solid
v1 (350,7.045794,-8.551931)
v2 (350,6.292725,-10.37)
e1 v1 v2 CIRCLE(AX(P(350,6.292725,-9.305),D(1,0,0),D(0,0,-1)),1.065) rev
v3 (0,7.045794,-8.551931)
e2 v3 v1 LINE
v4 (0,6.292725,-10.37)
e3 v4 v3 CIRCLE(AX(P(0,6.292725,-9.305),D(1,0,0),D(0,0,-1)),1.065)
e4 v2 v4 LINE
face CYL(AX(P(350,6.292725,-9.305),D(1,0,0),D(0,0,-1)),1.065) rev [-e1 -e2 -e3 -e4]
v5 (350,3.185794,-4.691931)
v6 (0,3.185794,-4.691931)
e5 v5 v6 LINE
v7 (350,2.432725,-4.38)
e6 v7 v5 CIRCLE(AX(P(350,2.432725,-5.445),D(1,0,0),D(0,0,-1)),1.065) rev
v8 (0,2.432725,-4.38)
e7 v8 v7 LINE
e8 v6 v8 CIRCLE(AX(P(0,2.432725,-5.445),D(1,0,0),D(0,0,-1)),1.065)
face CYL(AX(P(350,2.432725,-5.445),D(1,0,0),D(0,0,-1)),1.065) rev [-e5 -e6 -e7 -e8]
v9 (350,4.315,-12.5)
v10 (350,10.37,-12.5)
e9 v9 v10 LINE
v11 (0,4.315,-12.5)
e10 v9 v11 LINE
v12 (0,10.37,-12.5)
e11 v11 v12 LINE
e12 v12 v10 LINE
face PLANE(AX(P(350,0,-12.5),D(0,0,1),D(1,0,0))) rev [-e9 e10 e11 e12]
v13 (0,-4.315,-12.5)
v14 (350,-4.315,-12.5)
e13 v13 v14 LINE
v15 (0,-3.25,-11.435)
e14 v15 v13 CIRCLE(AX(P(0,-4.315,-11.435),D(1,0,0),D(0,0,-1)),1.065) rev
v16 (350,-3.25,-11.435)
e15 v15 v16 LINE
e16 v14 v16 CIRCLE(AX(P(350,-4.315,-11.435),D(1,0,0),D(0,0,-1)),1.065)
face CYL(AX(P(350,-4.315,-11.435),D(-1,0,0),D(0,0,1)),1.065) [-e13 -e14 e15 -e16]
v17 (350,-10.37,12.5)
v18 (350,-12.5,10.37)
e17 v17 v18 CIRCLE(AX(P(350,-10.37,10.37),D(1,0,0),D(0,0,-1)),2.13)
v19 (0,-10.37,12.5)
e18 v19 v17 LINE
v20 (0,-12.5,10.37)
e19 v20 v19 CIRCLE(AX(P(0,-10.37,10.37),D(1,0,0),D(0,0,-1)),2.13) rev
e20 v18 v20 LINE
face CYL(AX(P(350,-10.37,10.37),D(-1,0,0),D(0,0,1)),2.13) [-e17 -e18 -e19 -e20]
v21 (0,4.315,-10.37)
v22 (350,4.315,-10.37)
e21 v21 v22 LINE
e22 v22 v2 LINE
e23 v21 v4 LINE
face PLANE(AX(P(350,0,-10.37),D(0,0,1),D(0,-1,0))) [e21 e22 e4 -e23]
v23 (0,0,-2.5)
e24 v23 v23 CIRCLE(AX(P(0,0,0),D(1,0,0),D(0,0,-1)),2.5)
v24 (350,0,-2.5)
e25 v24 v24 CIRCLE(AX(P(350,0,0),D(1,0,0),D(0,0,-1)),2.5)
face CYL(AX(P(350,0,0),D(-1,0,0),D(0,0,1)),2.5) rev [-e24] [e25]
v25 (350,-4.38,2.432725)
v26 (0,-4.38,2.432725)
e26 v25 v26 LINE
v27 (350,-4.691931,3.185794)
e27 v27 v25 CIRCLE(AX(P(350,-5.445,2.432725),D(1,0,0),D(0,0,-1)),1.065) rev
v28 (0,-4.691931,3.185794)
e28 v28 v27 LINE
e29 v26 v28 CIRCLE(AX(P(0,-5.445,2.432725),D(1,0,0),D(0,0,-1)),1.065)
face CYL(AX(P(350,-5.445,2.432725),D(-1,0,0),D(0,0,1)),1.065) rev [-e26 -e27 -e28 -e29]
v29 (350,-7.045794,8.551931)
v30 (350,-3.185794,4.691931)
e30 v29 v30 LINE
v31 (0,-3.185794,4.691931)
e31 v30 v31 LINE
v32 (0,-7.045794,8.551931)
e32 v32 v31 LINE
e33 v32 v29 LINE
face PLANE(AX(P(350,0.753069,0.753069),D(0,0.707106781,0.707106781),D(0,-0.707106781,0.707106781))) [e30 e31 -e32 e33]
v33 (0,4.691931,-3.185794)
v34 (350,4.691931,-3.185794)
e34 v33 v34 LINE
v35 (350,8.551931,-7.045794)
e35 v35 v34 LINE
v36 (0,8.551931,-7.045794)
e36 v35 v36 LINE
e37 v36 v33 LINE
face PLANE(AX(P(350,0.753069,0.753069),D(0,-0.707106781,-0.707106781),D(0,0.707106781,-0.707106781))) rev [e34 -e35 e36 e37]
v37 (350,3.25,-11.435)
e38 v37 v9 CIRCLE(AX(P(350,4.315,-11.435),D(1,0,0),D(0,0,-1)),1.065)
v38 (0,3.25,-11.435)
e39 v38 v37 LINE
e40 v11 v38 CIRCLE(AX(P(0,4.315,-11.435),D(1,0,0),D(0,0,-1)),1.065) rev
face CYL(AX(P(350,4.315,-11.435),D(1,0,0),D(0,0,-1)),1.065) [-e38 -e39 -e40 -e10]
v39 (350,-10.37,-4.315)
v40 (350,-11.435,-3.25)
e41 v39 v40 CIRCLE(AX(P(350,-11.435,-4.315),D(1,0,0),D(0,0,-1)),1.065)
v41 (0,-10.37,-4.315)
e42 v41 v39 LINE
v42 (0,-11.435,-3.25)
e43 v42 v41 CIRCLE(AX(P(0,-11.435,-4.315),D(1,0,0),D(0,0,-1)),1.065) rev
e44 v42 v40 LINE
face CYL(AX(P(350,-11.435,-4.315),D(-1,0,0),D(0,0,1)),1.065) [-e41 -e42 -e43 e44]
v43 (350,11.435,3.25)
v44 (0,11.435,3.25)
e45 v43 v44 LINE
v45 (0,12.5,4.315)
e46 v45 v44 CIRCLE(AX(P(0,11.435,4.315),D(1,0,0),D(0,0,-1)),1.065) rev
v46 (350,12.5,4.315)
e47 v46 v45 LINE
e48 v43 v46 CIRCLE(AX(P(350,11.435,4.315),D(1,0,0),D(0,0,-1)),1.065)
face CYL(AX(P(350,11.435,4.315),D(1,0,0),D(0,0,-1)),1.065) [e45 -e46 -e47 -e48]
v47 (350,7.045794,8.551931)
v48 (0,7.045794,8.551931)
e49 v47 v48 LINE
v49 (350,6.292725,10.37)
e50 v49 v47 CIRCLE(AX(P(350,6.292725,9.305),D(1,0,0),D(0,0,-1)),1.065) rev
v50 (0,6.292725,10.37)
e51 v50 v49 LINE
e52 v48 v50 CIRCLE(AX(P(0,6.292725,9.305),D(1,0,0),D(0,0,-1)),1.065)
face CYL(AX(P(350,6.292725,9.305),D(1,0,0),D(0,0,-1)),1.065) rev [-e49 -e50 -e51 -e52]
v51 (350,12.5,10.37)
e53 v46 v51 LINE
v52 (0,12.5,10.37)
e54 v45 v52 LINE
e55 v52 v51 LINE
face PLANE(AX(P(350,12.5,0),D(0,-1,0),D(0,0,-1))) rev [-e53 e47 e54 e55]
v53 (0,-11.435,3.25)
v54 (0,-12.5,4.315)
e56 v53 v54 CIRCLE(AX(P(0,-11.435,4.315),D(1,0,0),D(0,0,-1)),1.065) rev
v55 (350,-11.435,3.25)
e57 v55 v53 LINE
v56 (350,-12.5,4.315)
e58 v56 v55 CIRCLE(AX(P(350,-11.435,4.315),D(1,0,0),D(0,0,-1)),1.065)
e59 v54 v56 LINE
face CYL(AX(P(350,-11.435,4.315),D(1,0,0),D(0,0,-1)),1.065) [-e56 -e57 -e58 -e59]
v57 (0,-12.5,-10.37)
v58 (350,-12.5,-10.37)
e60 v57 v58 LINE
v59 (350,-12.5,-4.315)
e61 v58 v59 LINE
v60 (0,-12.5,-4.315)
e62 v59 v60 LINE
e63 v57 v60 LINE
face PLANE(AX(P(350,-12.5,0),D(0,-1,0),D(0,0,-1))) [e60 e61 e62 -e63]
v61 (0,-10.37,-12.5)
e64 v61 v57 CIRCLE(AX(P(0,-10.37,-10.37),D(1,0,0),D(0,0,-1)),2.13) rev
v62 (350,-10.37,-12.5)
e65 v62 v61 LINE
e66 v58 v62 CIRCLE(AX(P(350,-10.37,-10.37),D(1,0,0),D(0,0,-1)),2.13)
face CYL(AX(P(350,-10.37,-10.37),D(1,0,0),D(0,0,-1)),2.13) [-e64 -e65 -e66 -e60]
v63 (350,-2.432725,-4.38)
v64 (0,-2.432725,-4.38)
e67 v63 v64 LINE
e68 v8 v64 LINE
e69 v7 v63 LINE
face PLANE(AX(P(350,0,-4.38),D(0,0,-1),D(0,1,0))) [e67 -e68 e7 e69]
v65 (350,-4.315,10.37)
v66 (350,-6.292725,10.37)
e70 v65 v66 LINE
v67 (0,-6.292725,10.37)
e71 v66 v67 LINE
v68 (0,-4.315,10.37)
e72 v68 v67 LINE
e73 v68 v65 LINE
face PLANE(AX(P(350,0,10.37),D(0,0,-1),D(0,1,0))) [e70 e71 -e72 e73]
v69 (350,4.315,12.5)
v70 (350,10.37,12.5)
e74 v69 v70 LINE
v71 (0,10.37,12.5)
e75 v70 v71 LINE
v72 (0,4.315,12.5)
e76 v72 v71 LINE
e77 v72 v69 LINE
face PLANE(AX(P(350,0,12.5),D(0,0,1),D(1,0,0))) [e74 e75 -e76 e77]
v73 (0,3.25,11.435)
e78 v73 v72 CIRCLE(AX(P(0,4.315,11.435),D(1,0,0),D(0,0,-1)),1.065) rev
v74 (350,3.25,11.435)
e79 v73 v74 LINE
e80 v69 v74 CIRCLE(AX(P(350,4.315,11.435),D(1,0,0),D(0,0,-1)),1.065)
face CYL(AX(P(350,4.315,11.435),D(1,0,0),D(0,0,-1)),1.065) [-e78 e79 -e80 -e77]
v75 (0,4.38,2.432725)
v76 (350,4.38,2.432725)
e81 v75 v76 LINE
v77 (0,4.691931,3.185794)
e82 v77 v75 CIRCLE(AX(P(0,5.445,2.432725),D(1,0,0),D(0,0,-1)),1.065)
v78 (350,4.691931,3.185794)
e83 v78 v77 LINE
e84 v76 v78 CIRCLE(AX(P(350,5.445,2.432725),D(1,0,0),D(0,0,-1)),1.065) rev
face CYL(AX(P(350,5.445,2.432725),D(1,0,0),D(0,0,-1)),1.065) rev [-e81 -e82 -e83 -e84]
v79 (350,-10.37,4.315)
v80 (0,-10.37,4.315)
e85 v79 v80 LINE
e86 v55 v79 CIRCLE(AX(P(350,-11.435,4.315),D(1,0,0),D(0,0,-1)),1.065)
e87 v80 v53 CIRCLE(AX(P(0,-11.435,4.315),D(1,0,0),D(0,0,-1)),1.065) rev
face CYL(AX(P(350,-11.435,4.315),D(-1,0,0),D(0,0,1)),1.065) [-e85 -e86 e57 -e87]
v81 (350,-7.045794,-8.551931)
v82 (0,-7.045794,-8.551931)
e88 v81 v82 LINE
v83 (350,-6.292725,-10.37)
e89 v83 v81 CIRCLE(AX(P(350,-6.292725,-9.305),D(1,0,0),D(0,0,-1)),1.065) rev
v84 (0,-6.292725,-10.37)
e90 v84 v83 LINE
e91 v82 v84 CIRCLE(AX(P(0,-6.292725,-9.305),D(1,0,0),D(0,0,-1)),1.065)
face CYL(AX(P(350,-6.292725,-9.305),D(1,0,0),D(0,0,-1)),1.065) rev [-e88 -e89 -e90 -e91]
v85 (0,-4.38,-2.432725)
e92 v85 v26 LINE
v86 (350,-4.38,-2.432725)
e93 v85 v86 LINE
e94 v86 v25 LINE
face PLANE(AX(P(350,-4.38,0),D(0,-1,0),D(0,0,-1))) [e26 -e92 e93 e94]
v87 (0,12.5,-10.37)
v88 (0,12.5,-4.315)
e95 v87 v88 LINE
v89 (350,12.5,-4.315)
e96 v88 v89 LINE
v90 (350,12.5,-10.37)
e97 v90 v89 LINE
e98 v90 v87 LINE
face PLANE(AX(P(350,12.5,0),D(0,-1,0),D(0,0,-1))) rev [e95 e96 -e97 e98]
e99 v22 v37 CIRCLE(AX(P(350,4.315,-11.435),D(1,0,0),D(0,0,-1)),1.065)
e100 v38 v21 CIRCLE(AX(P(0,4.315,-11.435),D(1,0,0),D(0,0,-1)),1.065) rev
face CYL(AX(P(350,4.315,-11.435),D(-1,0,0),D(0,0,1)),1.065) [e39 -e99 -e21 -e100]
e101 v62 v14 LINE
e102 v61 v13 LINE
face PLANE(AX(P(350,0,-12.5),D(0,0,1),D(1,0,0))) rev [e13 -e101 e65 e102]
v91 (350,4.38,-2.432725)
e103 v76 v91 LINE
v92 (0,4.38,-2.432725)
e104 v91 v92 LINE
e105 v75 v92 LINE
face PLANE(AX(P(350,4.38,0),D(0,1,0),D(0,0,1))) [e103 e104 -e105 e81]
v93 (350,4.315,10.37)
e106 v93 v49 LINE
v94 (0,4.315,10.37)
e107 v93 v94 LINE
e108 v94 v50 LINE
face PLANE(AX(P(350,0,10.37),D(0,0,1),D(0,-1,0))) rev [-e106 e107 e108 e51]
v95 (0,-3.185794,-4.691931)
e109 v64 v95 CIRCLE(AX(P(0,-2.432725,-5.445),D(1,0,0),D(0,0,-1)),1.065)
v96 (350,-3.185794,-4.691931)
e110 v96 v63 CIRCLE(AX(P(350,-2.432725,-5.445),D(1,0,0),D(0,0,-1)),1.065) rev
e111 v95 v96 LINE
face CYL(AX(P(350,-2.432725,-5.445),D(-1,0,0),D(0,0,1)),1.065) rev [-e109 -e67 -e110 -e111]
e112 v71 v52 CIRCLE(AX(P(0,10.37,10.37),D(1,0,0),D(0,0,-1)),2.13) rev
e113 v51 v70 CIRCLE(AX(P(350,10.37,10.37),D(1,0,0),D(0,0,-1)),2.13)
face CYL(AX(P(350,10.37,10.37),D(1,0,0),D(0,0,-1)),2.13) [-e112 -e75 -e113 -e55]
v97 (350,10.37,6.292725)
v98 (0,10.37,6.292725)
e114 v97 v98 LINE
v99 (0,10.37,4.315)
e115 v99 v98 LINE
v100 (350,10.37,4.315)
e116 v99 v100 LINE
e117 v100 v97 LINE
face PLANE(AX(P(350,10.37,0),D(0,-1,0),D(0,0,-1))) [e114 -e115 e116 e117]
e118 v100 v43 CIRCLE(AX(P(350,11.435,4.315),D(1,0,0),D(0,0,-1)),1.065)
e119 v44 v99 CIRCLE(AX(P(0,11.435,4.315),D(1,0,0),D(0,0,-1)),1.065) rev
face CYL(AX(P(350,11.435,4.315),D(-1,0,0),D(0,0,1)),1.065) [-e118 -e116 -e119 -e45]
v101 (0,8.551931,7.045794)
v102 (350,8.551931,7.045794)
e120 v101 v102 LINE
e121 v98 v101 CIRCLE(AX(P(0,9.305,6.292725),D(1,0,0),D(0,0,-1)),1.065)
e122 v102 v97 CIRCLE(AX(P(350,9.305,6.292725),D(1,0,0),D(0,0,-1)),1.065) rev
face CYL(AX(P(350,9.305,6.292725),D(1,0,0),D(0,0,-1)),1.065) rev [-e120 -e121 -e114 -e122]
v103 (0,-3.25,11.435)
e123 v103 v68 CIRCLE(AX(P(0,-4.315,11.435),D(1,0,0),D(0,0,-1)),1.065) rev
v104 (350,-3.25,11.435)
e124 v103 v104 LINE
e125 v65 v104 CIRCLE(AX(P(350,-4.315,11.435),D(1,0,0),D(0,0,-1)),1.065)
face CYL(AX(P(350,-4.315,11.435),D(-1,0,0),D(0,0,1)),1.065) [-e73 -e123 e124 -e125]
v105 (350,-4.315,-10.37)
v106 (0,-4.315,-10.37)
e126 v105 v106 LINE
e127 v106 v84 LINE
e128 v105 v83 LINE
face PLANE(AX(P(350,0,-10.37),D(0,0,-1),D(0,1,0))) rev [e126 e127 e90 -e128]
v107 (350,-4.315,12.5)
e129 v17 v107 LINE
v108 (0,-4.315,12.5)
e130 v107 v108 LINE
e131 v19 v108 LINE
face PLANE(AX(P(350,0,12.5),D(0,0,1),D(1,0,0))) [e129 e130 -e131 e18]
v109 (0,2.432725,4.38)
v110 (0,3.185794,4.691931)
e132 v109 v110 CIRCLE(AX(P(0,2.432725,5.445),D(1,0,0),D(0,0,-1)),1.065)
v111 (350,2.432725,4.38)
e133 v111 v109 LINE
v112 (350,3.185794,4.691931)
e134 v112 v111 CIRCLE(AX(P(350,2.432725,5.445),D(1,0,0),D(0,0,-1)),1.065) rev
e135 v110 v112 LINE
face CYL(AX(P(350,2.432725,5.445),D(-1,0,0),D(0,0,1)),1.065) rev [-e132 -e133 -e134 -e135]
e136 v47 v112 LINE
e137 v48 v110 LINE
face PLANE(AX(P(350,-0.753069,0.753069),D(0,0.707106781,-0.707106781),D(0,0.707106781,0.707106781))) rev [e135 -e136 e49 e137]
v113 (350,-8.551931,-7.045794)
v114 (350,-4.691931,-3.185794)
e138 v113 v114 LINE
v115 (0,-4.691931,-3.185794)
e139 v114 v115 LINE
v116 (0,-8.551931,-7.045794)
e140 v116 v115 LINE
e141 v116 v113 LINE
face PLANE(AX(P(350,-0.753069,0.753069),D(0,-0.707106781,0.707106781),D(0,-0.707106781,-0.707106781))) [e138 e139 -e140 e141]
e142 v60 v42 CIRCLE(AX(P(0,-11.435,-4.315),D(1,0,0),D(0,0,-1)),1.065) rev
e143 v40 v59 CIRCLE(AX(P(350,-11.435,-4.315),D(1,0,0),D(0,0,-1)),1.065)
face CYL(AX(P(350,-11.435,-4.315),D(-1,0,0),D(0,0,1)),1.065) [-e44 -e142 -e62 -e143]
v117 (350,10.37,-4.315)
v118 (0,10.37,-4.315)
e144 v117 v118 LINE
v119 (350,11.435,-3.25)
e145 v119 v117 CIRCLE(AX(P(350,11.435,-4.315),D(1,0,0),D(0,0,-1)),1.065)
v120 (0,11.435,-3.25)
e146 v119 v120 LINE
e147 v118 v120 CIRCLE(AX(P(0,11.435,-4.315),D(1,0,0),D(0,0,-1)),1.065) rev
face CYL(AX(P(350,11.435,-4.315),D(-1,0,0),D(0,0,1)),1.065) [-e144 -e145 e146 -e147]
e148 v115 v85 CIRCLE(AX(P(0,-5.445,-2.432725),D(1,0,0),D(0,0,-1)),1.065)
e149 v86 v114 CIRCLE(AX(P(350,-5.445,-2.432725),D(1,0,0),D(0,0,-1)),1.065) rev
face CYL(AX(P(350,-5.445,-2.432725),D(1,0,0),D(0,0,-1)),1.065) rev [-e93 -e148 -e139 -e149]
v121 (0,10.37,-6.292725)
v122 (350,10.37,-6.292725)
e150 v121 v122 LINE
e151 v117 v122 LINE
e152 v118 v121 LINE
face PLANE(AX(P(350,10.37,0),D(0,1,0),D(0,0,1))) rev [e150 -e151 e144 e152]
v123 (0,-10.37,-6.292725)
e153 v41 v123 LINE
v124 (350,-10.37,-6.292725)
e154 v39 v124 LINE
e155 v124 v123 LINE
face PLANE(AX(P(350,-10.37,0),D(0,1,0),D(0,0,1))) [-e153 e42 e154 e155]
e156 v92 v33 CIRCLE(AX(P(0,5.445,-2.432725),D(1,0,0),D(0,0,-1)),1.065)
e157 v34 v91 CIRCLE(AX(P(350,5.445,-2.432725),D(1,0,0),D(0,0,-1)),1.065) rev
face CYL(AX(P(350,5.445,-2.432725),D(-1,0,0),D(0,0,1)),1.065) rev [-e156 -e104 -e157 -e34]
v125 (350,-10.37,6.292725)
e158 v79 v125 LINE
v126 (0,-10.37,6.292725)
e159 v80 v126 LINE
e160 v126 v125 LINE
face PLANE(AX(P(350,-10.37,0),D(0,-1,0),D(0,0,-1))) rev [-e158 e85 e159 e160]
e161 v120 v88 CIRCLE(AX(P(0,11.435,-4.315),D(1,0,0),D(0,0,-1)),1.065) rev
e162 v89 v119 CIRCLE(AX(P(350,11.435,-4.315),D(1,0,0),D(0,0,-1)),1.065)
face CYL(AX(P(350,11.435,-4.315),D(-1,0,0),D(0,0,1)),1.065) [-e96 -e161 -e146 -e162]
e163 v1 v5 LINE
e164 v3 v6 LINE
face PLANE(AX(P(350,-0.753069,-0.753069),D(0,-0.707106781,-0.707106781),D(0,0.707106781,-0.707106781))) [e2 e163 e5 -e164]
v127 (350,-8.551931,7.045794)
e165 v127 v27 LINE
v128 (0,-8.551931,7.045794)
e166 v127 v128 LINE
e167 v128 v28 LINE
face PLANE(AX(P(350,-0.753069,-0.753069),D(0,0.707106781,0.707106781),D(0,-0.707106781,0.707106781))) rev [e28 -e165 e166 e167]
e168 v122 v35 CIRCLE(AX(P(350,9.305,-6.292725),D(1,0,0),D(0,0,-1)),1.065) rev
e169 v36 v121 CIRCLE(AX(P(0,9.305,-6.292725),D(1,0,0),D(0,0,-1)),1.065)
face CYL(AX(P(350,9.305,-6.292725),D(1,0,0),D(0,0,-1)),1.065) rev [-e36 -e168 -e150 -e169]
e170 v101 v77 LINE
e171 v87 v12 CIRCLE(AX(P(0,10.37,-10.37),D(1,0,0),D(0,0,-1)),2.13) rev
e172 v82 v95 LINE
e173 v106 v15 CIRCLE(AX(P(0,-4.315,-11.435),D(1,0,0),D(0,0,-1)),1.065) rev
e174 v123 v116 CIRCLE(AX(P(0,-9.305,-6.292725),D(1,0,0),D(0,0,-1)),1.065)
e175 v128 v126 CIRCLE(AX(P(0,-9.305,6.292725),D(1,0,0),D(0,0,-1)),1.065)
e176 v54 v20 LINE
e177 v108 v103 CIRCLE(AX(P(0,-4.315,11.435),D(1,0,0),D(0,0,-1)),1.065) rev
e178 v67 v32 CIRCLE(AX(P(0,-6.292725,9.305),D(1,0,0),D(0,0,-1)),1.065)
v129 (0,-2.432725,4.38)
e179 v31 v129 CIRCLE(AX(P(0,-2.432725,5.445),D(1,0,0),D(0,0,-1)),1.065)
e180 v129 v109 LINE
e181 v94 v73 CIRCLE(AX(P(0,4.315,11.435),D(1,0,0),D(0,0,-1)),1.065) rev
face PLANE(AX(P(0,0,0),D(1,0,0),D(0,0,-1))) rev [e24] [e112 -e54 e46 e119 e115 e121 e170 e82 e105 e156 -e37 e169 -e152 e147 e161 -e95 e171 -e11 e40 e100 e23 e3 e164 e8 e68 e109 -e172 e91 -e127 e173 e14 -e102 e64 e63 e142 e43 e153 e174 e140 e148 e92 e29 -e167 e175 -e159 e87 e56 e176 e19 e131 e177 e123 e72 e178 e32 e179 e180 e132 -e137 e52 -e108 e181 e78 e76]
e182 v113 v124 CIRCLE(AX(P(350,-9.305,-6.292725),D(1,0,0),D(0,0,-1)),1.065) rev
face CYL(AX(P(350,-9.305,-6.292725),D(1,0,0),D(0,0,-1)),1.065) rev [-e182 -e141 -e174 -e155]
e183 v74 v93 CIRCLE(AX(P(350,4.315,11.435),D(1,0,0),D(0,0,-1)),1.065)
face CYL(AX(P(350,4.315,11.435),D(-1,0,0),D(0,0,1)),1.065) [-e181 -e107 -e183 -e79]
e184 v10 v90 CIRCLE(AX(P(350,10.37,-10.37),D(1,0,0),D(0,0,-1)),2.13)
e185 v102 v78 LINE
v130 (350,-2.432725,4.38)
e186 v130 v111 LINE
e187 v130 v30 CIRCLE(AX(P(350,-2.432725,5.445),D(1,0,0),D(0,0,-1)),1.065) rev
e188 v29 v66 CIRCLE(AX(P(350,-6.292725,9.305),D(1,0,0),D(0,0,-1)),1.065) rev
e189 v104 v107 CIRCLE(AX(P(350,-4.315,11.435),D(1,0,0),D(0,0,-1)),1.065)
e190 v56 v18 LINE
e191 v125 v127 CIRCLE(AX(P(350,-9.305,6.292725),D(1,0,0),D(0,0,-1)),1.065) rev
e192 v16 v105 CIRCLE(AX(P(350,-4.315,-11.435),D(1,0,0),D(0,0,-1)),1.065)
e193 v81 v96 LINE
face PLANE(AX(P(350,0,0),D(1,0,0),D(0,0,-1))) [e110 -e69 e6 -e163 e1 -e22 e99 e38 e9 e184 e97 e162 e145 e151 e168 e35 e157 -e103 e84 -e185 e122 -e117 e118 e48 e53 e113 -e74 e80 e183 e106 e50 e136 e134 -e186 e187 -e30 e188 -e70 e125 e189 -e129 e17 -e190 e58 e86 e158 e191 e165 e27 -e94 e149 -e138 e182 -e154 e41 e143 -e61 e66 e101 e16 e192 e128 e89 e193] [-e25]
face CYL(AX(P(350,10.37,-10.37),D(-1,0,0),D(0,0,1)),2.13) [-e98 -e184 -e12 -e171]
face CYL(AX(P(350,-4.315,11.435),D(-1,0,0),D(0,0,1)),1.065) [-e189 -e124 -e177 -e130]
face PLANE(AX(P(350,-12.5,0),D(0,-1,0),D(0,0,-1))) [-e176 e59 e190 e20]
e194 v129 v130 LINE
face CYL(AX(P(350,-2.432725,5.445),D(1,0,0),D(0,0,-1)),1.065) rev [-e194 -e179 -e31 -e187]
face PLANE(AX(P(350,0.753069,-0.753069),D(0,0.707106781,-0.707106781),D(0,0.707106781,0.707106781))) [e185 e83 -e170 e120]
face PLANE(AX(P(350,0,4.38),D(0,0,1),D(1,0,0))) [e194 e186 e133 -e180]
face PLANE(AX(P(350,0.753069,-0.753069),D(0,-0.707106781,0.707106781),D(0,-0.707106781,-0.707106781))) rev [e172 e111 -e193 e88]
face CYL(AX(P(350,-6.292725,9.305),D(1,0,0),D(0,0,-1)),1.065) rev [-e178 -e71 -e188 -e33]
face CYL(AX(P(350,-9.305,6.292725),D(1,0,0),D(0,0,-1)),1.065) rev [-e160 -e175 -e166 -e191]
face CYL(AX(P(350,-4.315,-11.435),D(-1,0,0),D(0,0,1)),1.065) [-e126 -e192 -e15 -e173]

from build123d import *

# Parameters (mm, degrees)
SKETCH1_R           = 2.5
BOSS_EXTRUDE1_DEPTH = 350
FILLET1_R           = 1.065
FILLET2_R           = 2.13


with BuildPart() as part:
    # Sketch1 → Boss-Extrude1 (new body)
    with BuildSketch(Plane.YZ):
        Polygon((-12.5, -3.25), (-12.5, -12.5), (-3.25, -12.5), (-3.25, -10.37), (-8.863862556, -10.37), (-2.873862556, -4.38), (2.873862556, -4.38), (8.863862556, -10.37), (3.25, -10.37), (3.25, -12.5), (12.5, -12.5), (12.5, -3.25), (10.37, -3.25), (10.37, -8.863862556), (4.38, -2.873862556), (4.38, 2.873862556), (10.37, 8.863862556), (10.37, 3.25), (12.5, 3.25), (12.5, 12.5), (3.25, 12.5), (3.25, 10.37), (8.863862556, 10.37), (2.873862556, 4.38), (-2.873862556, 4.38), (-8.863862556, 10.37), (-3.25, 10.37), (-3.25, 12.5), (-12.5, 12.5), (-12.5, 3.25), (-10.37, 3.25), (-10.37, 8.863862556), (-4.38, 2.873862556), (-4.38, -2.873862556), (-10.37, -8.863862556), (-10.37, -3.25), align=None)
        with Locations(Location((0, 0, 0), (0, 0, 270))):
            Circle(SKETCH1_R, mode=Mode.SUBTRACT)
    extrude(amount=BOSS_EXTRUDE1_DEPTH)

    # Fillet1
    fillet1_edges = [part.edges().sort_by_distance(p)[0] for p in [
        (175, -10.37, -8.863862556),
        (175, 2.873862556, -4.38),
        (175, -2.873862556, -4.38),
        (175, -4.38, 2.873862556),
        (175, -4.38, -2.873862556),
        (175, -2.873862556, 4.38),
        (175, 2.873862556, 4.38),
        (175, 4.38, 2.873862556),
        (175, 4.38, -2.873862556),
        (175, -8.863862556, -10.37),
        (175, 8.863862556, -10.37),
        (175, 10.37, -8.863862556),
        (175, -10.37, 8.863862556),
        (175, -8.863862556, 10.37),
        (175, 10.37, 8.863862556),
        (175, 8.863862556, 10.37),
        (175, 12.5, 3.25),
        (175, -3.25, -12.5),
        (175, -10.37, 3.25),
        (175, 10.37, 3.25),
        (175, -10.37, -3.25),
        (175, -12.5, -3.25),
        (175, -12.5, 3.25),
        (175, 3.25, -10.37),
        (175, -3.25, -10.37),
        (175, 3.25, -12.5),
        (175, 10.37, -3.25),
        (175, 12.5, -3.25),
        (175, 3.25, 12.5),
        (175, 3.25, 10.37),
        (175, -3.25, 10.37),
        (175, -3.25, 12.5),
    ]]
    fillet(fillet1_edges, radius=FILLET1_R - 0.0001)  # a hair under: the kernel refuses the full size

    # Fillet2
    fillet2_edges = [part.edges().sort_by_distance(p)[0] for p in [
        (175, -12.5, 12.5),
        (175, 12.5, 12.5),
        (175, 12.5, -12.5),
        (175, -12.5, -12.5),
    ]]
    fillet(fillet2_edges, radius=FILLET2_R)


solid = part.part
